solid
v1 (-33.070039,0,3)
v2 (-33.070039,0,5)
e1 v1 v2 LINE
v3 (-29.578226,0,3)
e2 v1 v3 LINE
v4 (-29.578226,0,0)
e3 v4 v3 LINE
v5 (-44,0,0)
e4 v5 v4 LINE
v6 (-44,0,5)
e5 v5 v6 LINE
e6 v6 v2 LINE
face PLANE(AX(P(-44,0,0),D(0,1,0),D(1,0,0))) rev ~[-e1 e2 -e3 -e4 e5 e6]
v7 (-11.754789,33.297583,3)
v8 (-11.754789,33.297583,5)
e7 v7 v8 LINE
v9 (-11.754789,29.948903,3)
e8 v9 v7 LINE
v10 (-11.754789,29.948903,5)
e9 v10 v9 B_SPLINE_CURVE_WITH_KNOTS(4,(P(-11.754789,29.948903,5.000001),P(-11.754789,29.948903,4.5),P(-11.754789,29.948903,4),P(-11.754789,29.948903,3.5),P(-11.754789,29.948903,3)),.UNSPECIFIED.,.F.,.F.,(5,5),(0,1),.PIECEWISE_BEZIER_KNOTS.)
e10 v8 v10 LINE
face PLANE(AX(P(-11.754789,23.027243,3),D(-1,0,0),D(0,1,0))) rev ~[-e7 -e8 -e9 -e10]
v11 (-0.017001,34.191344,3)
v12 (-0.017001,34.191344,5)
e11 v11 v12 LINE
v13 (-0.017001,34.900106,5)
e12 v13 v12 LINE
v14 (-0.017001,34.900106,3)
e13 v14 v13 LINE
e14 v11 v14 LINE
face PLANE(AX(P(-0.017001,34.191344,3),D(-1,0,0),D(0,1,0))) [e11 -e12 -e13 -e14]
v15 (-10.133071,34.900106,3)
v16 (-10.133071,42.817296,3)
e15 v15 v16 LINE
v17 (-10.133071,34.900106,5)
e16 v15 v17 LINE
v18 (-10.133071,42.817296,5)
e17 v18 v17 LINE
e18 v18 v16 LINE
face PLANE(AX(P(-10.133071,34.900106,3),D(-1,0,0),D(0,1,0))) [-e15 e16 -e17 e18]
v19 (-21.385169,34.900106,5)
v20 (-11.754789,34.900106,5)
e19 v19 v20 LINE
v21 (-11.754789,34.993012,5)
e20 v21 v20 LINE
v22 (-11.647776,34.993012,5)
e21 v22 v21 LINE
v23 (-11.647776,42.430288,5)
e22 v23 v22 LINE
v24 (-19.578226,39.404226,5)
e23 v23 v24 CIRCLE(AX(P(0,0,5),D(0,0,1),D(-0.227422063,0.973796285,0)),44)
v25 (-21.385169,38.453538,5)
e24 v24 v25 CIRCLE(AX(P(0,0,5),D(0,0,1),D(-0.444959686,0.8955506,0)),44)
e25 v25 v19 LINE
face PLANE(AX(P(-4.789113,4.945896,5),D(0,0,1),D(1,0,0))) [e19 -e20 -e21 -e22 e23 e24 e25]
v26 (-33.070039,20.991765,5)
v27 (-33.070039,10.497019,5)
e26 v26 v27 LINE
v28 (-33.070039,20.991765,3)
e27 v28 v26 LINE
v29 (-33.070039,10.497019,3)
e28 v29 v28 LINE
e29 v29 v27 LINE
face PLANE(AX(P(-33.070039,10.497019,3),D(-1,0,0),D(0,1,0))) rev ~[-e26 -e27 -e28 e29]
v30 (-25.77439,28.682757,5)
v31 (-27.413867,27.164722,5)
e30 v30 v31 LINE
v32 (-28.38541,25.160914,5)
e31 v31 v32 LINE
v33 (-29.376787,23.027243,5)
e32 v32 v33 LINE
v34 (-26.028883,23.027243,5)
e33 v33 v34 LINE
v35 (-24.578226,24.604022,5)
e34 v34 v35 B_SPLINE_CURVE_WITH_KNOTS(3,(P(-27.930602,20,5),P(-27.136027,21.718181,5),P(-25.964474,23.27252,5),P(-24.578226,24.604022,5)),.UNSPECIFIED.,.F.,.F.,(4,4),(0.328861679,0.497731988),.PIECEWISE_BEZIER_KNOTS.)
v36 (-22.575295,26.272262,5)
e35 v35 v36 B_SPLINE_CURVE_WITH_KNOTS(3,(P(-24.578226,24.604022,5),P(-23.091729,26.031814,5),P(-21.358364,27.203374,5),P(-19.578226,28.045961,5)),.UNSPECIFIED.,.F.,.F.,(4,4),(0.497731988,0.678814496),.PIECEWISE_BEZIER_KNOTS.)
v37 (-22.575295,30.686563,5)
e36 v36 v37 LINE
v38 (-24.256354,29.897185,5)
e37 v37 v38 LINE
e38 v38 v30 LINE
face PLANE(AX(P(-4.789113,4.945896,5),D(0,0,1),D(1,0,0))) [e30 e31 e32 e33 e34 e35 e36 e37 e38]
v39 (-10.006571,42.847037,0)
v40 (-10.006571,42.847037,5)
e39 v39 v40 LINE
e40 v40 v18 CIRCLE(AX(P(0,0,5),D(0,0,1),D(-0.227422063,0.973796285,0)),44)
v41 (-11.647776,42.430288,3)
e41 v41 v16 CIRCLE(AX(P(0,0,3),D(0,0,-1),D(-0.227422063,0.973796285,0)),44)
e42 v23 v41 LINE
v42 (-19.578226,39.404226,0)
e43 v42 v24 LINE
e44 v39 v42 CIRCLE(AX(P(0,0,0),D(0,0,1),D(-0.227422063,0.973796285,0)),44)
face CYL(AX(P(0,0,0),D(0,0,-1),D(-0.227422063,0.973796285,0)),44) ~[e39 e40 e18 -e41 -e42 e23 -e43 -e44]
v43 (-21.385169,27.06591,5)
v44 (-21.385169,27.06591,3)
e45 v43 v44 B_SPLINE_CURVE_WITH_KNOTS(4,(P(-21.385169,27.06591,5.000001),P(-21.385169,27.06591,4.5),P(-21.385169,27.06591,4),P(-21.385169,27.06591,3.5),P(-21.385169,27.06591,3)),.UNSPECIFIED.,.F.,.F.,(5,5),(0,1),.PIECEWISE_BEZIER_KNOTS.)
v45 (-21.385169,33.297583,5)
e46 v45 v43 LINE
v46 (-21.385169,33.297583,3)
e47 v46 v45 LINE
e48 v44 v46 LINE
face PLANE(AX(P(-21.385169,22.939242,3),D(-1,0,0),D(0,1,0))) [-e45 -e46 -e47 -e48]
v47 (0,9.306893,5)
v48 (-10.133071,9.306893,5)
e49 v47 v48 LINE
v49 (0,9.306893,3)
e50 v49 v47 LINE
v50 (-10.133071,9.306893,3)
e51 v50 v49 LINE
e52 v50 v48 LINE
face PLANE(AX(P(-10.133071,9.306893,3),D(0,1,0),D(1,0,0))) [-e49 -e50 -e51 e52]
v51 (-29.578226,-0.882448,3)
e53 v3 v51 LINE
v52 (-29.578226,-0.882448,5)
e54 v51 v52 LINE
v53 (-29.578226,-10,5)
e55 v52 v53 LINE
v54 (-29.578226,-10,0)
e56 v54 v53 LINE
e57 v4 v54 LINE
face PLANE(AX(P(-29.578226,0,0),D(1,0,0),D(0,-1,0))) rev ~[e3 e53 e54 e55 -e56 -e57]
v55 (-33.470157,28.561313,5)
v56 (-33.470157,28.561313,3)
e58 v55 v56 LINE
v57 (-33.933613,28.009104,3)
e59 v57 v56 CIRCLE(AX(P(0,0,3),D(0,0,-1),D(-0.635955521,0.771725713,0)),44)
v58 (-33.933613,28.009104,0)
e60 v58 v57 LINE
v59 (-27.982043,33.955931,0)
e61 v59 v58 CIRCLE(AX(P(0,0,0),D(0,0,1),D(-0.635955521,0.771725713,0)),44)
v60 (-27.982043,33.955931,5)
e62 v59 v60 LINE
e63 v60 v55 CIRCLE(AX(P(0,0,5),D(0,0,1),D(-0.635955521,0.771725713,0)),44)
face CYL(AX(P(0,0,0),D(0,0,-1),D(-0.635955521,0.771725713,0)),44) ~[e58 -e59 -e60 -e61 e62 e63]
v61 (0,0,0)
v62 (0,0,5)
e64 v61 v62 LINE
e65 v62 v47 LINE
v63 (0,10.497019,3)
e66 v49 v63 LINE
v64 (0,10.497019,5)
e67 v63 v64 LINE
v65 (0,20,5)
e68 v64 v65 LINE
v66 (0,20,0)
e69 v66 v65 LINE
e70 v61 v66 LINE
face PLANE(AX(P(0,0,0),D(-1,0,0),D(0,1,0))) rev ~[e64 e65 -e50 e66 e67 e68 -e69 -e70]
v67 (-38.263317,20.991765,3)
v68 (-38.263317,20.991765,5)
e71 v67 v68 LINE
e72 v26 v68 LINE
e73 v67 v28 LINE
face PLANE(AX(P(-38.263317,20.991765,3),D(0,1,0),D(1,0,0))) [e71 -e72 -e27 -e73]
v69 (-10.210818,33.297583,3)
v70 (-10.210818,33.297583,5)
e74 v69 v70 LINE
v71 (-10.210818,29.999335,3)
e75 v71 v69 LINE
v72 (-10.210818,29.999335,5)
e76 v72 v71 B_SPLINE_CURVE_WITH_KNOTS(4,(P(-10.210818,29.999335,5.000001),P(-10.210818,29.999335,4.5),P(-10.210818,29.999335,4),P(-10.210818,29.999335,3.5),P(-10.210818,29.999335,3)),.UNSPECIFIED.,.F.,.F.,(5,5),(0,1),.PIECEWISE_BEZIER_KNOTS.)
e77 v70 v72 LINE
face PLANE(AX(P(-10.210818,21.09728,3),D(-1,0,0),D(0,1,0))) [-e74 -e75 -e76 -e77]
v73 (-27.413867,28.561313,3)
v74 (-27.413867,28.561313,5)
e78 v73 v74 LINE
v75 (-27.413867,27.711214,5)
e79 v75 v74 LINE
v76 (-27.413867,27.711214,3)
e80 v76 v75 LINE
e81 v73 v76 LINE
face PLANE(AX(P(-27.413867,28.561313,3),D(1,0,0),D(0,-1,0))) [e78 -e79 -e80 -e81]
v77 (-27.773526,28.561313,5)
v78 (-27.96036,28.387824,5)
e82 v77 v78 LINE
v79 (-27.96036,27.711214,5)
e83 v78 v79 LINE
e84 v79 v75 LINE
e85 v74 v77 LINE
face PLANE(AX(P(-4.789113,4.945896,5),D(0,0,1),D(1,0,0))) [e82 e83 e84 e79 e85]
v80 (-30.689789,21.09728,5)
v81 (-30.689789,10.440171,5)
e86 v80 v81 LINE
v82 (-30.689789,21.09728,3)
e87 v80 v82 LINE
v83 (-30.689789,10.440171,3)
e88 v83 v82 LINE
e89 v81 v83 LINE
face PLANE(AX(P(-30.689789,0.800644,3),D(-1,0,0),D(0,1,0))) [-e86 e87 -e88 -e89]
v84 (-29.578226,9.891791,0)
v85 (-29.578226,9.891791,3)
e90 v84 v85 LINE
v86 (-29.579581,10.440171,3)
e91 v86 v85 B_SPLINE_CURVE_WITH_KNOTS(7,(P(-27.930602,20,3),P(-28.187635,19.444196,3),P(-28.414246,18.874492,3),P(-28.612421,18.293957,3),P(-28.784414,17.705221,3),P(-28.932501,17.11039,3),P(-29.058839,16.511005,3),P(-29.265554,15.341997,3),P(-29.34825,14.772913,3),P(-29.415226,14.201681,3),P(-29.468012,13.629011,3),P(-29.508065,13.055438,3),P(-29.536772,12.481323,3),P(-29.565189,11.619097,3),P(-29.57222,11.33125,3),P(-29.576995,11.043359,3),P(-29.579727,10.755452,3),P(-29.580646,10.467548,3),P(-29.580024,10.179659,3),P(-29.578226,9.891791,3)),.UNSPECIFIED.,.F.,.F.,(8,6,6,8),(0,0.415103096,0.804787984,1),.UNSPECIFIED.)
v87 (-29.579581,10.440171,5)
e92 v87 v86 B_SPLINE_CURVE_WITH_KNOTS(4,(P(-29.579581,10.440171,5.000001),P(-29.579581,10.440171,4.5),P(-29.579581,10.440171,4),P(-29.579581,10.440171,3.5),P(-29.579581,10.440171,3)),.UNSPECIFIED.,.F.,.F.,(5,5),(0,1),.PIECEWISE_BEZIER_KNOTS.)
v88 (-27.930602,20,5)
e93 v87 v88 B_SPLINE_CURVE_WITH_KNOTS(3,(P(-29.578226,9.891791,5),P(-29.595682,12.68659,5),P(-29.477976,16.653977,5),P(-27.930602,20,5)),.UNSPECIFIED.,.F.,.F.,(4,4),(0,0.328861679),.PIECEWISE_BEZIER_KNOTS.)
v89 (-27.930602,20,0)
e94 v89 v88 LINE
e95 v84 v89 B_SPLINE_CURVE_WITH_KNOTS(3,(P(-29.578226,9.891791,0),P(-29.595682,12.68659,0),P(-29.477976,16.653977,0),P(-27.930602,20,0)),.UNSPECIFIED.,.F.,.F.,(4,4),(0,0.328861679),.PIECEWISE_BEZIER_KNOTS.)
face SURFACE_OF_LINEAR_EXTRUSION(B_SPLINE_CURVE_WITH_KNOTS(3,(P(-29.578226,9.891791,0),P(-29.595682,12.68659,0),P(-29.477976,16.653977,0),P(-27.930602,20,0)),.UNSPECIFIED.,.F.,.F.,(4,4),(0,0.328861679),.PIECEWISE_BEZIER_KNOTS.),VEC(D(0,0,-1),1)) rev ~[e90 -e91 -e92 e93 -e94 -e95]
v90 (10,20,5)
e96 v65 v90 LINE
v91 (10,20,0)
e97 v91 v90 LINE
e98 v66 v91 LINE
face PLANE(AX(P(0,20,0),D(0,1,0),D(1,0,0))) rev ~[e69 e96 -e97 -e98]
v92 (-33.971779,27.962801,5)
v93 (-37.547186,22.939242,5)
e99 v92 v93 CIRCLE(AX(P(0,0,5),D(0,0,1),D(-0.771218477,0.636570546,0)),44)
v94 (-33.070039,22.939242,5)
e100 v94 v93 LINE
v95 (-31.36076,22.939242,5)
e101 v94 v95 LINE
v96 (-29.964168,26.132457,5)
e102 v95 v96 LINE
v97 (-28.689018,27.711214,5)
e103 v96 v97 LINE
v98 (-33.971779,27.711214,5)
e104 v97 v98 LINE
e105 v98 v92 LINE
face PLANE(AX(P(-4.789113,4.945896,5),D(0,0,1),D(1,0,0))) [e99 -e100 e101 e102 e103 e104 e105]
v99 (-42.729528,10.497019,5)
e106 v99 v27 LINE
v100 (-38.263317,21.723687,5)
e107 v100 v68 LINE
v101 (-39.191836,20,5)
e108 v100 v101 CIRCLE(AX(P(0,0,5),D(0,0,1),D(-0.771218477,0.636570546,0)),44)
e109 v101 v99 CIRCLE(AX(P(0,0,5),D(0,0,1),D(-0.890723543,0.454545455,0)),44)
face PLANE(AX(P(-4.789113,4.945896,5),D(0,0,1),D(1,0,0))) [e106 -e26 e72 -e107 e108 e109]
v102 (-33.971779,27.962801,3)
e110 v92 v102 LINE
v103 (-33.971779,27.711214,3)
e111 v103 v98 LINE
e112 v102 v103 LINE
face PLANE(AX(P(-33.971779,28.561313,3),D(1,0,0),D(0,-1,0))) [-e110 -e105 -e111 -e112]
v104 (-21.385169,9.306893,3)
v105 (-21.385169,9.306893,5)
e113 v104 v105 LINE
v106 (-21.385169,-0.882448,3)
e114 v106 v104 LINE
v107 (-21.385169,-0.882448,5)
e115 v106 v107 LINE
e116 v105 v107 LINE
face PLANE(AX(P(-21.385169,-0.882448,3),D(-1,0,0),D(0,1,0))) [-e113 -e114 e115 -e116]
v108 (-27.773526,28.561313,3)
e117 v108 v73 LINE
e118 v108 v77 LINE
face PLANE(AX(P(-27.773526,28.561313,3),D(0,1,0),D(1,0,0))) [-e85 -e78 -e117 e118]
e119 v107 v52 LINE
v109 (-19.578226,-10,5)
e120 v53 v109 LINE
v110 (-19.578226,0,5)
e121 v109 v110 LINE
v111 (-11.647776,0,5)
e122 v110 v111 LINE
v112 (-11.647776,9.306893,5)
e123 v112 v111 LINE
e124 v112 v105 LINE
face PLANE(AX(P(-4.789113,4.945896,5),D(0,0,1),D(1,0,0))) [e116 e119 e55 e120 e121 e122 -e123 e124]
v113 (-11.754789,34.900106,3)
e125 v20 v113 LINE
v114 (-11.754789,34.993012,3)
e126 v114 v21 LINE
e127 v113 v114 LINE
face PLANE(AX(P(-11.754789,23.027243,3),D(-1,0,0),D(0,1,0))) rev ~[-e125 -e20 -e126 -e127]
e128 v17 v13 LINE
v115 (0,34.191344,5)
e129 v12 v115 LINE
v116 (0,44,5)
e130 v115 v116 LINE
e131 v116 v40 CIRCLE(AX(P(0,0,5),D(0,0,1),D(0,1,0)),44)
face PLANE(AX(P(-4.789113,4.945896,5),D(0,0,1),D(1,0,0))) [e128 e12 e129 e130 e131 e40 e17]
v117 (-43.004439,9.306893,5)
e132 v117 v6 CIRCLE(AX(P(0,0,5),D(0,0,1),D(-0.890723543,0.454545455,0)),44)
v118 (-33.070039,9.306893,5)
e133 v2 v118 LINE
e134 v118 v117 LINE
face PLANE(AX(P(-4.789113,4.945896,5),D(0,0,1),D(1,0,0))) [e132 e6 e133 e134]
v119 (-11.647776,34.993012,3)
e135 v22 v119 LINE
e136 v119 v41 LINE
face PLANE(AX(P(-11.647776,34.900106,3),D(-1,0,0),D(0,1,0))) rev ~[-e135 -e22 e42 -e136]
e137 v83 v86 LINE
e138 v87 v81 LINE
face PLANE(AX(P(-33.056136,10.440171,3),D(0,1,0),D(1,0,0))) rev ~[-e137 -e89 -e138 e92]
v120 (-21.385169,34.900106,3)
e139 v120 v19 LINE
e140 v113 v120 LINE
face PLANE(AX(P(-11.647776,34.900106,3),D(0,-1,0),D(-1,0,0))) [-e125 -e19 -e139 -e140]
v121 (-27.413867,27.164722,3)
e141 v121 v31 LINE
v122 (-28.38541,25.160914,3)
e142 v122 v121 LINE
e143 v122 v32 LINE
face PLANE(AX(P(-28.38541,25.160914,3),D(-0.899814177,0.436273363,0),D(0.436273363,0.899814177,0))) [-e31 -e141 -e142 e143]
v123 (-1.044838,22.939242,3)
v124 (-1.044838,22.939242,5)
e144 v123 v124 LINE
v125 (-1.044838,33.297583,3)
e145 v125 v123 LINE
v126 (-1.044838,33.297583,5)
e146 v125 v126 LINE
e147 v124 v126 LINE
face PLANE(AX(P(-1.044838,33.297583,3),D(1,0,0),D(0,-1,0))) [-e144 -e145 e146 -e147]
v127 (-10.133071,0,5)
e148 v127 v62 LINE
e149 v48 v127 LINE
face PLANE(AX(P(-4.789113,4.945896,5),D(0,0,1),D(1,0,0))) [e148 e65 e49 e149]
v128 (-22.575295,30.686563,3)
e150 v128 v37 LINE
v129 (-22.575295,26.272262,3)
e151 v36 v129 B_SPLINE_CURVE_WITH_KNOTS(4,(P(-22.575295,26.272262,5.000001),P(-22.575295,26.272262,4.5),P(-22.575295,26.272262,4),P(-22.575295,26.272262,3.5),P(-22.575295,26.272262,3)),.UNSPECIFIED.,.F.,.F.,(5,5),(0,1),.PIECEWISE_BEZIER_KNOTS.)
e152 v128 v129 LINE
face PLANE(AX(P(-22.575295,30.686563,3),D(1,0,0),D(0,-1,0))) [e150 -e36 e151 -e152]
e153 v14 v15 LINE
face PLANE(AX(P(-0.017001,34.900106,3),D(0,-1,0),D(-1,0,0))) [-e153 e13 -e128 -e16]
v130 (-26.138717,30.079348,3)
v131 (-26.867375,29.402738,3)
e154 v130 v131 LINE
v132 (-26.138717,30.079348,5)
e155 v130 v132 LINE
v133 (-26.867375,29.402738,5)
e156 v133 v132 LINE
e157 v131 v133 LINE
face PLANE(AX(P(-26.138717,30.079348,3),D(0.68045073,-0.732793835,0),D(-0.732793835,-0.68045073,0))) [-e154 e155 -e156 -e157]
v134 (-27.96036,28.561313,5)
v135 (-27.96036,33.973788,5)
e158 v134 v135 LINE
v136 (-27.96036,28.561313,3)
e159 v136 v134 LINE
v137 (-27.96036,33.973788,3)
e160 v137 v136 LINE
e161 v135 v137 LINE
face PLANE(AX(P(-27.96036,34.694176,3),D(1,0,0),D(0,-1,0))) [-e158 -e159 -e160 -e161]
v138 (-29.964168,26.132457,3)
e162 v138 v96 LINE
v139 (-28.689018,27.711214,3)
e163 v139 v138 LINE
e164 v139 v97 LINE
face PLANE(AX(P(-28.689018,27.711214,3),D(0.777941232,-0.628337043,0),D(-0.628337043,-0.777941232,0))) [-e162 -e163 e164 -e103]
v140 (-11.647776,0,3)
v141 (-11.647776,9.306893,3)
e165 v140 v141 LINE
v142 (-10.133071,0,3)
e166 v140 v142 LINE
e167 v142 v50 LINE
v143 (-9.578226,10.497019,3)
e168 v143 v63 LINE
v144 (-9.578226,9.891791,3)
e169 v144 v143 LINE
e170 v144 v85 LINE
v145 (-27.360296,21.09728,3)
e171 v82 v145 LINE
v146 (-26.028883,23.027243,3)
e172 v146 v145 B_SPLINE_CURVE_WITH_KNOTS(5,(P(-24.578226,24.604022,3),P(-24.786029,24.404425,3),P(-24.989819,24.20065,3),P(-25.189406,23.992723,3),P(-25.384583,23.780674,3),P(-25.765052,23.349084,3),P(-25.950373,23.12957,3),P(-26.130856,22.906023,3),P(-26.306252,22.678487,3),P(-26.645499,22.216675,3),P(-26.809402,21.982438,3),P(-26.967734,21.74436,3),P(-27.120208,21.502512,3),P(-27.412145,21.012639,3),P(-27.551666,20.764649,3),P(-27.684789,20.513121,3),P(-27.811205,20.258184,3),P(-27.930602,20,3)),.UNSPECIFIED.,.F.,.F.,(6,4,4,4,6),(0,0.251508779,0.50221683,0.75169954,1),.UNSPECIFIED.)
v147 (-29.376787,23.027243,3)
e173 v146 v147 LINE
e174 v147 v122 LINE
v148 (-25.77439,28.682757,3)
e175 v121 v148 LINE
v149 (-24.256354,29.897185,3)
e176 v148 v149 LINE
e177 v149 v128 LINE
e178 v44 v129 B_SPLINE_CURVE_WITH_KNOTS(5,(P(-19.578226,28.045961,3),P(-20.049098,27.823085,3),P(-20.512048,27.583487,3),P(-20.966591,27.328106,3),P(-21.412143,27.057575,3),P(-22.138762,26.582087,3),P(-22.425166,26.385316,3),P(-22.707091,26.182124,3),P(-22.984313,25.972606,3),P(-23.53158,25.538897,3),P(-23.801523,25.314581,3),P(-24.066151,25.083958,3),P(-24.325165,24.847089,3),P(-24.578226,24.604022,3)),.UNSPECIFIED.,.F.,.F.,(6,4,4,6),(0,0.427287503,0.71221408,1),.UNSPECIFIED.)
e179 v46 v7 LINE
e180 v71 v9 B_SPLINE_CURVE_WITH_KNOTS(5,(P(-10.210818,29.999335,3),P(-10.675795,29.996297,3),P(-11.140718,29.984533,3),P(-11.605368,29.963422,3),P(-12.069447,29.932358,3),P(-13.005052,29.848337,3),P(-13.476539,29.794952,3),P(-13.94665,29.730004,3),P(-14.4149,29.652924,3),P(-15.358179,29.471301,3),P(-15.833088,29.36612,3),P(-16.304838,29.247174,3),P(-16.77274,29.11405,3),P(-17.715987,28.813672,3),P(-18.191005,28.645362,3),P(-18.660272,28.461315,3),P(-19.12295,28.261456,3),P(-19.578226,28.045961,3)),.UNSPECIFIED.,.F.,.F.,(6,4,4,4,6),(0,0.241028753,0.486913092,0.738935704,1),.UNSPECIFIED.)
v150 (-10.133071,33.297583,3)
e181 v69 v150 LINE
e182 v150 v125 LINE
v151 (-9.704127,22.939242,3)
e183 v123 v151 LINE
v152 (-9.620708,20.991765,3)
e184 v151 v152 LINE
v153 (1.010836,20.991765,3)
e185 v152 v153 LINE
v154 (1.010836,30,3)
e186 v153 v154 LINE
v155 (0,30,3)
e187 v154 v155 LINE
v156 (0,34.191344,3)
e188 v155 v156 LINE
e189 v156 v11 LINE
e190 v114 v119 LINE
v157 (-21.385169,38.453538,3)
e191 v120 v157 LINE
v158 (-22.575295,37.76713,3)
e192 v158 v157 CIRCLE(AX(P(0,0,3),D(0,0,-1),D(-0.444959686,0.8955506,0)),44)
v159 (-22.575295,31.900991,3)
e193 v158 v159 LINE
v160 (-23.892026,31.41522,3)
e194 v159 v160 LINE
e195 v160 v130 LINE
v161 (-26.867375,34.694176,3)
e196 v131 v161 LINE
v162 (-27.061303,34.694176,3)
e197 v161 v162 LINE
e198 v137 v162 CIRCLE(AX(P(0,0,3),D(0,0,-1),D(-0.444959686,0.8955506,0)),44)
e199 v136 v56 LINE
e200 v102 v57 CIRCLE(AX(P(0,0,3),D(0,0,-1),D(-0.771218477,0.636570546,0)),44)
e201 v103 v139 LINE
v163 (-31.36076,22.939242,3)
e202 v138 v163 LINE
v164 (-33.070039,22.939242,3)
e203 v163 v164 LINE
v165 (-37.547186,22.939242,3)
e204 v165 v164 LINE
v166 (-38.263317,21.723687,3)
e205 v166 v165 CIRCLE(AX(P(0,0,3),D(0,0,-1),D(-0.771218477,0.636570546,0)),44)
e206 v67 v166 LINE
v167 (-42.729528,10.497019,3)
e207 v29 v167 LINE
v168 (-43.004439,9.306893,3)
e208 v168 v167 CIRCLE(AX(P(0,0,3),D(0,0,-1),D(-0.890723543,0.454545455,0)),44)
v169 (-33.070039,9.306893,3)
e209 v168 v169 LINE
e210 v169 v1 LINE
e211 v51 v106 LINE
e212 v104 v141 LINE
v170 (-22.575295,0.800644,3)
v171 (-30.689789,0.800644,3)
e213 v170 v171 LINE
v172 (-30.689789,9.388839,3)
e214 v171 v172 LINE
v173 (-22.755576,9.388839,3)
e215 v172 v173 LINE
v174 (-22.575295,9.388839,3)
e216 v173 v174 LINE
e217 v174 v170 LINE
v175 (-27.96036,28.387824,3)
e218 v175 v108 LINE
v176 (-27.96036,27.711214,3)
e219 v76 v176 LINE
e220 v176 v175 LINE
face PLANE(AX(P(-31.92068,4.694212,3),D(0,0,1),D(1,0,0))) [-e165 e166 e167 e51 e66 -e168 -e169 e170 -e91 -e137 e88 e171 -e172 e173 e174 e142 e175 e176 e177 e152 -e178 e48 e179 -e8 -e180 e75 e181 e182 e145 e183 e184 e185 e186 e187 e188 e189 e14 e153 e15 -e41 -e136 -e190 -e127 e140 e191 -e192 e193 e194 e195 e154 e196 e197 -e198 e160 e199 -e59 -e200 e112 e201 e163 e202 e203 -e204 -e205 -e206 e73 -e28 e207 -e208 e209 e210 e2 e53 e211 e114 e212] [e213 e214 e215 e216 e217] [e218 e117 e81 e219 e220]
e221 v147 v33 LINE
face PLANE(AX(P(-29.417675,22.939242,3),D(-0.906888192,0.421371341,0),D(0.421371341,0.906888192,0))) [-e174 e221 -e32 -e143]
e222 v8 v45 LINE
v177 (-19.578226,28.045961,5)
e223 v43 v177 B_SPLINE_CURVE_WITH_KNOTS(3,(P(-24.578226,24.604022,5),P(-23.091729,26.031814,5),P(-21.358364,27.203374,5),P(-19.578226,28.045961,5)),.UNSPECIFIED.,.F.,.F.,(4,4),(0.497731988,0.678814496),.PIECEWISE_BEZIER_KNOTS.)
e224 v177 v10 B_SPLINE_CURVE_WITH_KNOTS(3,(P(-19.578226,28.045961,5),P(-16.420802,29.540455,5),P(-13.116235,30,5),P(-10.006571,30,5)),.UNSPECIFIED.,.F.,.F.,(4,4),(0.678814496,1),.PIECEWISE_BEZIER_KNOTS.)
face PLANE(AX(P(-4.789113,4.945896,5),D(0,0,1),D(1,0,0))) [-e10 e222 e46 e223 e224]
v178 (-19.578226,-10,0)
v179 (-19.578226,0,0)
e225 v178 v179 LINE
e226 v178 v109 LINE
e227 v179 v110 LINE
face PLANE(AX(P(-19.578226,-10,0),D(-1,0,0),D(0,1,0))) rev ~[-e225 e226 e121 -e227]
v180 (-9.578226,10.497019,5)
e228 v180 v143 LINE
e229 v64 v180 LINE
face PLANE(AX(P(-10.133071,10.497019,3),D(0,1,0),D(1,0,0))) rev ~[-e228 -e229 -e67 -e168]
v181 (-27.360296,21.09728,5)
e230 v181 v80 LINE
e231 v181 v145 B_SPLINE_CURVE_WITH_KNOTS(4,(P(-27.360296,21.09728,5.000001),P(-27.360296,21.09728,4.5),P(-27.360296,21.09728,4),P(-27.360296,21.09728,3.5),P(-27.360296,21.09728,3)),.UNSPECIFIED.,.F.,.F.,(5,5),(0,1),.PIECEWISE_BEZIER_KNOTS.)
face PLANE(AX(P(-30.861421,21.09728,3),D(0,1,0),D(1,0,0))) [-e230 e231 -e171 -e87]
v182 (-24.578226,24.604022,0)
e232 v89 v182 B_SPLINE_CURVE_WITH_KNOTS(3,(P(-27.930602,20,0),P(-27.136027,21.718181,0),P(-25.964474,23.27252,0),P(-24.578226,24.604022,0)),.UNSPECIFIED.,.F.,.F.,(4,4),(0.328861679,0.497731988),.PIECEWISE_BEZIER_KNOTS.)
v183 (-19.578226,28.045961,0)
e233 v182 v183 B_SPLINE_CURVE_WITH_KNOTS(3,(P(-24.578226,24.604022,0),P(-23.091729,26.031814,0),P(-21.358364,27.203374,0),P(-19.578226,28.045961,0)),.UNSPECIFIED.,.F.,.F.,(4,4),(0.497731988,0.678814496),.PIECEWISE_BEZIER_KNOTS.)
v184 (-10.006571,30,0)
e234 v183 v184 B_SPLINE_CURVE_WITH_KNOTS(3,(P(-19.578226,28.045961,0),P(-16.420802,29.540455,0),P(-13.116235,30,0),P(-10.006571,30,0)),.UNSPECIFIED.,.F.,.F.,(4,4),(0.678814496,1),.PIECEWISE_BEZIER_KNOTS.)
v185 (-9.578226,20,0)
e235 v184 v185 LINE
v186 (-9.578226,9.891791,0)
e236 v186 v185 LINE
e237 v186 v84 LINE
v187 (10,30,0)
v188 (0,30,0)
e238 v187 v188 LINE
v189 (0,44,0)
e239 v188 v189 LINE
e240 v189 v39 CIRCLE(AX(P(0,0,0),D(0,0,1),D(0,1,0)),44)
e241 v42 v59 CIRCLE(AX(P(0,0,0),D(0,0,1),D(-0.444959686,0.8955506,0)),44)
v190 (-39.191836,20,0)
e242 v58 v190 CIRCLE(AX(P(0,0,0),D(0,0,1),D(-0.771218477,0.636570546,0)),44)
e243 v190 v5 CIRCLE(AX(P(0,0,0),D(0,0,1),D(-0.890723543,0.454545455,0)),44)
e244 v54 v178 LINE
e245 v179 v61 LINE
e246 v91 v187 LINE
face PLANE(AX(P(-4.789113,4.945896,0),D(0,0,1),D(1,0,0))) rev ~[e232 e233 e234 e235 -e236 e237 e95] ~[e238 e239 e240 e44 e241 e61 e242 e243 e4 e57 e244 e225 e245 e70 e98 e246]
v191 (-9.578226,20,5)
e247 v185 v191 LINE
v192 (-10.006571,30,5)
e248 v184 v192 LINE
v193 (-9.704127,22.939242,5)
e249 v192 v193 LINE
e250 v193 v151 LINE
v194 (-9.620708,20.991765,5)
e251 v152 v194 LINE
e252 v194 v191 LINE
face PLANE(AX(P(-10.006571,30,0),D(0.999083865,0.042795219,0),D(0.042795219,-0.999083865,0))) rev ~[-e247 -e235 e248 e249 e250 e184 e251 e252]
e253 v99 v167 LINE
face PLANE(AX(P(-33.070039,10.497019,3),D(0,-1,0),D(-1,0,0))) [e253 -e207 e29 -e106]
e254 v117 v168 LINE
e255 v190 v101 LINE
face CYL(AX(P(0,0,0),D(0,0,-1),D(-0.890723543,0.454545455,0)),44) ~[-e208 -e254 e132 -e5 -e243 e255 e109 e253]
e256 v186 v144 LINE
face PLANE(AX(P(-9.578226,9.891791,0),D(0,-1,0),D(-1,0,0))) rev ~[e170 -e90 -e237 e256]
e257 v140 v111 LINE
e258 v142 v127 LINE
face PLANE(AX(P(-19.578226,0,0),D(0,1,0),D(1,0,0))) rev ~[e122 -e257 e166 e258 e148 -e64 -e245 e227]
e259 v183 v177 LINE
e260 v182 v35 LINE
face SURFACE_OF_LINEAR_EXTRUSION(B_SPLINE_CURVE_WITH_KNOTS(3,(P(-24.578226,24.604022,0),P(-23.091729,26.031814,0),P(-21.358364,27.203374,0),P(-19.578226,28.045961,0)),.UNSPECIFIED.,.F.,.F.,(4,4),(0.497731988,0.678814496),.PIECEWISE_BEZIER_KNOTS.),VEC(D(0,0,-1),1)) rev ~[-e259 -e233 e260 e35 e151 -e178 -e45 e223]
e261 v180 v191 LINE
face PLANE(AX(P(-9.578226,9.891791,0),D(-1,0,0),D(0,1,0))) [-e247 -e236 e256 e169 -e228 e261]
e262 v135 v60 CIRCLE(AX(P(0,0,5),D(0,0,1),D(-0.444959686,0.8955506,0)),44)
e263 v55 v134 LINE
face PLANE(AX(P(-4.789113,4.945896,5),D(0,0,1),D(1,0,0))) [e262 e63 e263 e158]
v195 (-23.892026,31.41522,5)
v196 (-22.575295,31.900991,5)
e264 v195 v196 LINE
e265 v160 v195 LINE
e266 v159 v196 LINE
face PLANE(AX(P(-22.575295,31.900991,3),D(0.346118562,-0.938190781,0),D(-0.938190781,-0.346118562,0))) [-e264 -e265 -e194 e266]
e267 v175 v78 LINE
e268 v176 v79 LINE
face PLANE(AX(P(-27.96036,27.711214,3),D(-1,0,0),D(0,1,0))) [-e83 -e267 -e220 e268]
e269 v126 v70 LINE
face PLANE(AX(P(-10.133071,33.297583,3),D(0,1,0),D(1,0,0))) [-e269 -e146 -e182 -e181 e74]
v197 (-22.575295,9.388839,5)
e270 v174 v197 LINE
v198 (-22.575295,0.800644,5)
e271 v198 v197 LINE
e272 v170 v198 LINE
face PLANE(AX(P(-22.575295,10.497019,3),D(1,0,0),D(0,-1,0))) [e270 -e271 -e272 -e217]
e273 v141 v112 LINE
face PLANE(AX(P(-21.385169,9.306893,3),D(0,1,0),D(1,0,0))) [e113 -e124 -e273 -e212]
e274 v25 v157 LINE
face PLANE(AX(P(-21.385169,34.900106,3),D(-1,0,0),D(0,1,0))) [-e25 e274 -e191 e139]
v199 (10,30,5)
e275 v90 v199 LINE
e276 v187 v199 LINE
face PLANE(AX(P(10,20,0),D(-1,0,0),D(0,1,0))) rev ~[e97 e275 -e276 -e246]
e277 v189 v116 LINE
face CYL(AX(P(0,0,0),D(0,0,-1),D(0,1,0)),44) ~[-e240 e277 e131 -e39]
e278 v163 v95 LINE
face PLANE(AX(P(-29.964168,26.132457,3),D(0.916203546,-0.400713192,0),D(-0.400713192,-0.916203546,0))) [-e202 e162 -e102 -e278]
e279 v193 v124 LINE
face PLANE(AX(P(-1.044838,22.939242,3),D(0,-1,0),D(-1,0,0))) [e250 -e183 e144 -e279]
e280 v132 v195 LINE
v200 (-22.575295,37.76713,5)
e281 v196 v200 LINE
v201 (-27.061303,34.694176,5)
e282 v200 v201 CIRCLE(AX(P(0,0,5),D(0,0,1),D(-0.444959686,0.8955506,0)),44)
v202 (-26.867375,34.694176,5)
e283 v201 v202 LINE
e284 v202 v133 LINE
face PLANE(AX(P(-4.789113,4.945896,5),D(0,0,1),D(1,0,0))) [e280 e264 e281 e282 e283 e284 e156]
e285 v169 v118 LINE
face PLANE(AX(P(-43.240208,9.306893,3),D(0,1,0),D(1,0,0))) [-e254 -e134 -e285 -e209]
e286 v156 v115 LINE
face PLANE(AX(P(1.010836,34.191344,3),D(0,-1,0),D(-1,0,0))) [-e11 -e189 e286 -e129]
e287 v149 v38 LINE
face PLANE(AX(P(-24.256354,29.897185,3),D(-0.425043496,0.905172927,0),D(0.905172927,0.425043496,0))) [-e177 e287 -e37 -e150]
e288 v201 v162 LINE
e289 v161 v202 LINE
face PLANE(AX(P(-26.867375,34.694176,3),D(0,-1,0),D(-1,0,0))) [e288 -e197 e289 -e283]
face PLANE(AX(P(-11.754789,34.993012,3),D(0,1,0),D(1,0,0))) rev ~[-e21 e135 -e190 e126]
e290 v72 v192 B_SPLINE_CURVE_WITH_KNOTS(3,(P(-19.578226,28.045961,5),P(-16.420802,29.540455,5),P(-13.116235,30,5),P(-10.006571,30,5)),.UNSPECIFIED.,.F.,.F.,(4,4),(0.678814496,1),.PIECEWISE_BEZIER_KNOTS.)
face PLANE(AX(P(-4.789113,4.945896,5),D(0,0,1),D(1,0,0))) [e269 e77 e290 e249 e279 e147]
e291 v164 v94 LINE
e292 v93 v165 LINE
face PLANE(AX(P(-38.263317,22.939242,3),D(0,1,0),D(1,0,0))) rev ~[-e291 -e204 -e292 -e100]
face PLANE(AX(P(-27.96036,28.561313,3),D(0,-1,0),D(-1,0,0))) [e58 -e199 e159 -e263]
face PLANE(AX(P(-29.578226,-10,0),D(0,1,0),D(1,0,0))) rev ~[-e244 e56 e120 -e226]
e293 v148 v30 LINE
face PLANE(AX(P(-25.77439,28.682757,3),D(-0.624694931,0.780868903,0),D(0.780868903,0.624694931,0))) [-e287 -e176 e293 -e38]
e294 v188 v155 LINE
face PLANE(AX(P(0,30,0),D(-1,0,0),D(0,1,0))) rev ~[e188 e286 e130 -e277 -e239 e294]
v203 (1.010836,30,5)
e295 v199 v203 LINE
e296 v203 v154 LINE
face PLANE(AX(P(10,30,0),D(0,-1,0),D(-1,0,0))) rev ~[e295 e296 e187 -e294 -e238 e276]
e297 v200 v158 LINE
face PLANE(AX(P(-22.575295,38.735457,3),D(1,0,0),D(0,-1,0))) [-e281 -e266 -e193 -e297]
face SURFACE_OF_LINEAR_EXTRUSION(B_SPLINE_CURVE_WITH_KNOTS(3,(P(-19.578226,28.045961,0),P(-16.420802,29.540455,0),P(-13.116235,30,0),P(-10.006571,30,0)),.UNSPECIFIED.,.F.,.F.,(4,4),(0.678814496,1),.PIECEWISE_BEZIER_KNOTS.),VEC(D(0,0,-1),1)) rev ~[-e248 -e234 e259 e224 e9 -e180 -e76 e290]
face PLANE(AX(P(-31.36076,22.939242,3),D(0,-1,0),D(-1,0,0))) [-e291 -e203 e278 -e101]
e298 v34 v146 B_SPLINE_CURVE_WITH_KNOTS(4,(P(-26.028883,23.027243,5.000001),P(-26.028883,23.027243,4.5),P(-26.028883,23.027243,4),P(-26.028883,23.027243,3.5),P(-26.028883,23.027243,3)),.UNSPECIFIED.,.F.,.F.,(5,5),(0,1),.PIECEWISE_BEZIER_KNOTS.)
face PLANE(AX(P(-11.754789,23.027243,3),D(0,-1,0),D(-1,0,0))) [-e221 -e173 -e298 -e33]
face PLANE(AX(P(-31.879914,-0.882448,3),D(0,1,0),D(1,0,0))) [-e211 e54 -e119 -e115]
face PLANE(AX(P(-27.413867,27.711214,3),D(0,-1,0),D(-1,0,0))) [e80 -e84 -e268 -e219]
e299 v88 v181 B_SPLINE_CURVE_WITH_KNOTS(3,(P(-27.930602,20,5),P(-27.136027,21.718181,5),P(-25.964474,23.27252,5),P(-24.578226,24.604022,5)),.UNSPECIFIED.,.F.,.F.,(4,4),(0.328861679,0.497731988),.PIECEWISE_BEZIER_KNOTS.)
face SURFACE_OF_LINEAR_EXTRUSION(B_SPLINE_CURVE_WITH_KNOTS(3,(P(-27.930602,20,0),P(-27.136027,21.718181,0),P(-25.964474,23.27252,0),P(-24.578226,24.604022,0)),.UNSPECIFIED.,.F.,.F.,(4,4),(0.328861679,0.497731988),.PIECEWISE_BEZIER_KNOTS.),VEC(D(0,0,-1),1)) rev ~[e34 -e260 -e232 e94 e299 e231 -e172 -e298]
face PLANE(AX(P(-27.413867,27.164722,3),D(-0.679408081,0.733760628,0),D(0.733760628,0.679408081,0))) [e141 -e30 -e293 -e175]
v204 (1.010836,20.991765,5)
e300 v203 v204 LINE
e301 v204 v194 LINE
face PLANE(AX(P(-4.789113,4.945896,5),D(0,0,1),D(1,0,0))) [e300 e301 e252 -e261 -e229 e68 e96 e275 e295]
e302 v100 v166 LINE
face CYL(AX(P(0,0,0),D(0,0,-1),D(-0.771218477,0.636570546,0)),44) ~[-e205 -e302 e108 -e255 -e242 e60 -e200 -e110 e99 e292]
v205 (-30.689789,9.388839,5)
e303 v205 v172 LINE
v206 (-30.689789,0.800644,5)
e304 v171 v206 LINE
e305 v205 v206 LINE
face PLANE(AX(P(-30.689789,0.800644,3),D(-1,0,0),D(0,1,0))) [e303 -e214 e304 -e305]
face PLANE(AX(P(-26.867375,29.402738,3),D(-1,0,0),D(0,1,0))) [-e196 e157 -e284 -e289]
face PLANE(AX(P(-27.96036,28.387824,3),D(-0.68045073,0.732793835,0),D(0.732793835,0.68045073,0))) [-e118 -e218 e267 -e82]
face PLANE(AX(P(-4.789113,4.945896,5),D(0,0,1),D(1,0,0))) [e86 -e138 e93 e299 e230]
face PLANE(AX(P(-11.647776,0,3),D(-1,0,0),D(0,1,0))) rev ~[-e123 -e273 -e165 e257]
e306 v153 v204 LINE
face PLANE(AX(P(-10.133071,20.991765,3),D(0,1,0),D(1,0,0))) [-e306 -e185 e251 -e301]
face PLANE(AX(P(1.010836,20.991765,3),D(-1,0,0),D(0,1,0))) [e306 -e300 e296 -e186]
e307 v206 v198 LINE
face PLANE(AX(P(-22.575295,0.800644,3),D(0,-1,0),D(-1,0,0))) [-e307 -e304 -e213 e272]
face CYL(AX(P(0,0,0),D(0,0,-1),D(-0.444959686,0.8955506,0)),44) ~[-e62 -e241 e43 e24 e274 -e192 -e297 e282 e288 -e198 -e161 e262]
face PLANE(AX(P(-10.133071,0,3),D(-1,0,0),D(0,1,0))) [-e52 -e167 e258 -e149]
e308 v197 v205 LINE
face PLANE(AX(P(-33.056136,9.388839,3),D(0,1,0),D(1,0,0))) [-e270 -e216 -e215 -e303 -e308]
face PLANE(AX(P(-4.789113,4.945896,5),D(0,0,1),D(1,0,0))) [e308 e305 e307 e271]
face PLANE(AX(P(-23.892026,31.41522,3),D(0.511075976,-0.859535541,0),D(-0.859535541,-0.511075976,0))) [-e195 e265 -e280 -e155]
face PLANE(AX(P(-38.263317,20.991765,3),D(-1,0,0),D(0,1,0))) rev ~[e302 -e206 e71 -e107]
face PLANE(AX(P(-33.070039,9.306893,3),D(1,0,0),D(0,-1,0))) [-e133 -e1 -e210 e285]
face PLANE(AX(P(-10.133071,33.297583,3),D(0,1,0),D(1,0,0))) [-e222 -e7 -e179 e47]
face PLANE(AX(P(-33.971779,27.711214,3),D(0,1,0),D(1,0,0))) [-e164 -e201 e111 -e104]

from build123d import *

# Parameters (mm, degrees)
F1_W     = 9.5782261753
F1_H     = 9.891791337
F1_H_2   = 10.108208663
F1_W_2   = 10
F1_H_3   = 10
F2_DEPTH = 5
F3_W     = 10.1701691747
F3_H     = 1.1901259422
F3_W_2   = 2.3802500218
F3_W_3   = 1.1901250109
F3_H_2   = 0.8006438729
F3_H_3   = 10.4947462678
F3_W_4   = 5.1932781935
F3_H_4   = 1.9474774599
F3_W_5   = 1.1901259422
F3_H_5   = 8.5062488797
F3_W_6   = 9.7373928875
F3_W_7   = 1.514704898
F3_H_6   = 9.3068927526
F3_W_8   = 10.1330708712
F3_H_7   = 1.6025230289
F3_W_9   = 9.0882331133
F3_H_8   = 3.835350275
F3_W_10  = 1.0448377579
F3_H_9   = 8.595854044
F3_W_11  = 1.0108357528
F3_W_12  = 1.0278367554
F3_H_10  = 0.8937604725
F4_DEPTH = 25
F5_W     = 8.1058442593
F5_H     = 1.9299630076
F5_W_2   = 1.5439689159
F5_W_3   = 1.5439717099
F5_H_2   = 11.9657684118
F5_W_4   = 10.3005599231
F5_H_3   = 1.0513318703
F6_DEPTH = 25


# Not quite as in the source:
# - a feature names something its author has since deleted; it is built from what else it names


with BuildPart() as f2:
    # F1 (on Top) → F2 (new body)
    with BuildSketch(Plane.XY):
        with Locations((-4.7891130877, 4.9458956685)):
            Rectangle(F1_W, F1_H)
        Polygon((-10, 0), (-9.5782261753, 0), (-9.5782261753, 9.891791337), (-19.5782261753, 9.891791337), (-19.5782261753, 0), align=None)
        with Locations((-4.7891130877, 14.9458956685)):
            Rectangle(F1_W, F1_H_2)
        Polygon((0, 30), (0, 20), (0.4217738247, 20), (10, 20), (10, 30), align=None)
        Polygon((-9.5782261753, 20), (0, 20), (0, 30), (-10.0065707871, 30), align=None)
        with Locations((-24.5782261753, 4.9458956685)):
            Rectangle(F1_W_2, F1_H)
        with Locations((-24.5782261753, -5)):
            Rectangle(F1_W_2, F1_H_3)
        with BuildLine():
            Line((-10.0065707871, 30), (0, 30))
            Line((0, 30), (0, 44))
            ThreePointArc((0, 44), (-5.0363871882, 43.7108087787), (-10.0065707871, 42.8470365496))
            Line((-10.0065707871, 42.8470365496), (-10.0065707871, 30))
        make_face()
        with BuildLine():
            Line((-44, 0), (-29.5782261753, 0))
            Line((-29.5782261753, 0), (-29.5782261753, 9.891791337))
            add(Edge.make_bspline(
                [(-29.5782261753, 9.891791337), (-29.5956822452, 12.6865898133), (-29.4779762378, 16.6539770733), (-27.9306023487, 20)],
                knots=[0, 0, 0, 0, 0.3288616787, 0.3288616787, 0.3288616787, 0.3288616787], degree=3))
            Line((-27.9306023487, 20), (-39.1918358845, 20))
            ThreePointArc((-39.1918358845, 20), (-42.7810751321, 10.2849215136), (-44, 0))
        make_face()
        with BuildLine():
            add(Edge.make_bspline(
                [(-19.5782261753, 28.0459611928), (-16.4208018887, 29.540455447), (-13.1162348053, 30), (-10.0065707871, 30)],
                knots=[0.678814496, 0.678814496, 0.678814496, 0.678814496, 1, 1, 1, 1], degree=3))
            Line((-10.0065707871, 30), (-10.0065707871, 42.8470365496))
            ThreePointArc((-10.0065707871, 42.8470365496), (-14.8922224071, 41.4031606496), (-19.5782261753, 39.4042264209))
            Line((-19.5782261753, 39.4042264209), (-19.5782261753, 28.0459611928))
        make_face()
        with BuildLine():
            add(Edge.make_bspline(
                [(-24.5782261753, 24.6040217078), (-23.0917294817, 26.0318138691), (-21.358363516, 27.2033740757), (-19.5782261753, 28.0459611928)],
                knots=[0.497731988, 0.497731988, 0.497731988, 0.497731988, 0.678814496, 0.678814496, 0.678814496, 0.678814496], degree=3))
            Line((-19.5782261753, 28.0459611928), (-19.5782261753, 39.4042264209))
            ThreePointArc((-19.5782261753, 39.4042264209), (-23.9356591488, 36.9199704918), (-27.9820429197, 33.9559313529))
            Line((-27.9820429197, 33.9559313529), (-24.5782261753, 24.6040217078))
        make_face()
        with BuildLine():
            Line((-39.1918358845, 20), (-27.9306023487, 20))
            add(Edge.make_bspline(
                [(-27.9306023487, 20), (-27.136026622, 21.7181811177), (-25.9644735778, 23.2725198056), (-24.5782261753, 24.6040217078)],
                knots=[0.3288616787, 0.3288616787, 0.3288616787, 0.3288616787, 0.497731988, 0.497731988, 0.497731988, 0.497731988], degree=3))
            Line((-24.5782261753, 24.6040217078), (-33.9336129947, 28.00910404))
            ThreePointArc((-33.9336129947, 28.00910404), (-36.7813710365, 24.148100229), (-39.1918358845, 20))
        make_face()
        with BuildLine():
            Line((-33.9336129947, 28.00910404), (-24.5782261753, 24.6040217078))
            Line((-24.5782261753, 24.6040217078), (-27.9820429197, 33.9559313529))
            ThreePointArc((-27.9820429197, 33.9559313529), (-31.1002942205, 31.1250975806), (-33.9336129947, 28.00910404))
        make_face()
    extrude(amount=F2_DEPTH)

    # F3 (on offset) → F4 (cut)
    with BuildSketch(Plane.XY.offset(3)):
        Polygon((-33.0700390041, 9.3068927526), (-33.0700390041, 0), (-31.8799139932, 0), (-31.8799139932, 0.8006438729), (-30.6897889823, 0.8006438729), (-30.6897889823, 9.3068927526), align=None)
        with Locations((-38.1551235914, 9.9019557238)):
            Rectangle(F3_W, F3_H)
        with Locations((-31.8799139932, 9.9019557238)):
            Rectangle(F3_W_2, F3_H)
        with Locations((-31.2848514877, 0.4003219365)):
            Rectangle(F3_W_3, F3_H_2)
        Polygon((-30.6897889823, 0), (-31.8799139932, 0), (-31.8799139932, -0.8824482211), (-21.3851686567, -0.8824482211), (-21.3851686567, 0), (-22.5752945989, 0), (-22.5752945989, 0.8006438729), (-30.6897889823, 0.8006438729), align=None)
        with Locations((-31.8799139932, 15.7443918288)):
            Rectangle(F3_W_2, F3_H_3)
        with Locations((-35.6666781008, 21.9655036926)):
            Rectangle(F3_W_4, F3_H_4)
        Polygon((-33.0700390041, 22.9392424226), (-33.0700390041, 20.9917649627), (-30.6897889823, 20.9917649627), (-30.6897889823, 22.9392424226), (-31.3607603312, 22.9392424226), align=None)
        with Locations((-21.9802316278, 5.0537683128)):
            Rectangle(F3_W_5, F3_H_5)
        with Locations((-21.9802316278, 9.9019557238)):
            Rectangle(F3_W_5, F3_H)
        with Locations((-21.9802316278, 0.4003219365)):
            Rectangle(F3_W_5, F3_H_2)
        with Locations((-16.516472213, 9.9019557238)):
            Rectangle(F3_W_6, F3_H)
        Polygon((-29.9641676247, 26.1324569583), (-31.3607603312, 22.9392424226), (-30.6897889823, 22.9392424226), (-29.4176749885, 22.9392424226), (-28.3854100853, 25.160914287), (-27.413867414, 27.1647218615), (-25.7743895054, 28.682757169), (-24.2563541979, 29.8971850425), (-22.5752945989, 30.6865628809), (-22.5752945989, 31.9009907544), (-23.8920263946, 31.41522035), (-26.1387173086, 30.0793480128), (-26.8673747778, 29.40273819), (-26.8673747778, 27.7112144977), (-27.413867414, 27.7112144977), (-27.9603600502, 27.7112144977), (-28.6890175194, 27.7112144977), align=None)
        with Locations((-10.8904233202, 4.6534463763)):
            Rectangle(F3_W_7, F3_H_6)
        with Locations((-10.8904233202, 9.9019557238)):
            Rectangle(F3_W_7, F3_H)
        Polygon((-22.5752945989, 30.6865628809), (-22.5752945989, 22.9392424226), (-21.3851686567, 22.9392424226), (-21.3851686567, 33.2975834608), (-22.5752945989, 33.2975834608), (-22.5752945989, 31.9009907544), align=None)
        with Locations((-10.8904233202, 15.7443918288)):
            Rectangle(F3_W_7, F3_H_3)
        with Locations((-5.0665354356, 9.9019557238)):
            Rectangle(F3_W_8, F3_H)
        Polygon((-27.9603600502, 28.3878243205), (-28.6890175194, 27.7112144977), (-27.9603600502, 27.7112144977), align=None)
        Polygon((-33.9717790484, 27.7112144977), (-28.6890175194, 27.7112144977), (-27.9603600502, 28.3878243205), (-27.9603600502, 28.5613127053), (-33.9717790484, 28.5613127053), align=None)
        with Locations((-10.8904233202, 21.9655036926)):
            Rectangle(F3_W_7, F3_H_4)
        Polygon((-27.9603600502, 28.5613127053), (-27.9603600502, 28.3878243205), (-27.7735262161, 28.5613127053), align=None)
        with Locations((-21.9802316278, 34.0988449752)):
            Rectangle(F3_W_5, F3_H_7)
        with Locations((-16.516472213, 34.0988449752)):
            Rectangle(F3_W_6, F3_H_7)
        with Locations((-5.5889543146, 21.9655036926)):
            Rectangle(F3_W_9, F3_H_4)
        Polygon((-27.413867414, 28.5613127053), (-27.413867414, 27.7112144977), (-26.8673747778, 27.7112144977), (-26.8673747778, 29.40273819), (-27.7735262161, 28.5613127053), align=None)
        Polygon((-27.9603600502, 34.6941761672), (-27.9603600502, 28.5613127053), (-27.7735262161, 28.5613127053), (-26.8673747778, 29.40273819), (-26.8673747778, 34.6941761672), align=None)
        with Locations((-21.9802316278, 36.8177816272)):
            Rectangle(F3_W_5, F3_H_8)
        with Locations((-10.8904233202, 34.0988449752)):
            Rectangle(F3_W_7, F3_H_7)
        with Locations((-0.522418879, 21.9655036926)):
            Rectangle(F3_W_10, F3_H_4)
        with Locations((-10.8904233202, 39.1980335116)):
            Rectangle(F3_W_7, F3_H_9)
        Polygon((-10.1330708712, 34.9001064897), (-10.1330708712, 33.2975834608), (-1.0448377579, 33.2975834608), (-1.0448377579, 34.1913439333), (-0.0170010026, 34.1913439333), (-0.0170010026, 34.9001064897), align=None)
        Polygon((-1.0448377579, 33.2975834608), (-1.0448377579, 22.9392424226), (0, 22.9392424226), (1.0108357528, 22.9392424226), (1.0108357528, 34.1913439333), (-0.0170010026, 34.1913439333), (-0.0170010026, 33.2975834608), align=None)
        with Locations((0.5054178764, 21.9655036926)):
            Rectangle(F3_W_11, F3_H_4)
        with Locations((-0.5309193803, 33.7444636971)):
            Rectangle(F3_W_12, F3_H_10)
    extrude(amount=F4_DEPTH, mode=Mode.SUBTRACT)

    # F5 (on offset) → F6 (cut)
    with BuildSketch(Plane.XY.offset(3)):
        with Locations((-26.8084984273, 22.0622615889)):
            Rectangle(F5_W, F5_H)
        with Locations((-21.9835918397, 22.0622615889)):
            Rectangle(F5_W_2, F5_H)
        Polygon((-11.7547893897, 23.0272430927), (-21.2116073817, 23.0272430927), (-21.2116073817, 21.0972800851), (-10.2108176798, 21.0972800851), (-10.2108176798, 23.0272430927), align=None)
        Polygon((-21.2116073817, 21.0972800851), (-22.7555762976, 21.0972800851), (-22.7555762976, 10.4401707649), (-22.7555762976, 9.3888388947), (-21.2116073817, 9.3888388947), align=None)
        with Locations((-10.9828035347, 29.0101272985)):
            Rectangle(F5_W_3, F5_H_2)
        with Locations((-27.9058562592, 9.9145048298)):
            Rectangle(F5_W_4, F5_H_3)
    extrude(amount=F6_DEPTH, mode=Mode.SUBTRACT)


solid = f2.part
